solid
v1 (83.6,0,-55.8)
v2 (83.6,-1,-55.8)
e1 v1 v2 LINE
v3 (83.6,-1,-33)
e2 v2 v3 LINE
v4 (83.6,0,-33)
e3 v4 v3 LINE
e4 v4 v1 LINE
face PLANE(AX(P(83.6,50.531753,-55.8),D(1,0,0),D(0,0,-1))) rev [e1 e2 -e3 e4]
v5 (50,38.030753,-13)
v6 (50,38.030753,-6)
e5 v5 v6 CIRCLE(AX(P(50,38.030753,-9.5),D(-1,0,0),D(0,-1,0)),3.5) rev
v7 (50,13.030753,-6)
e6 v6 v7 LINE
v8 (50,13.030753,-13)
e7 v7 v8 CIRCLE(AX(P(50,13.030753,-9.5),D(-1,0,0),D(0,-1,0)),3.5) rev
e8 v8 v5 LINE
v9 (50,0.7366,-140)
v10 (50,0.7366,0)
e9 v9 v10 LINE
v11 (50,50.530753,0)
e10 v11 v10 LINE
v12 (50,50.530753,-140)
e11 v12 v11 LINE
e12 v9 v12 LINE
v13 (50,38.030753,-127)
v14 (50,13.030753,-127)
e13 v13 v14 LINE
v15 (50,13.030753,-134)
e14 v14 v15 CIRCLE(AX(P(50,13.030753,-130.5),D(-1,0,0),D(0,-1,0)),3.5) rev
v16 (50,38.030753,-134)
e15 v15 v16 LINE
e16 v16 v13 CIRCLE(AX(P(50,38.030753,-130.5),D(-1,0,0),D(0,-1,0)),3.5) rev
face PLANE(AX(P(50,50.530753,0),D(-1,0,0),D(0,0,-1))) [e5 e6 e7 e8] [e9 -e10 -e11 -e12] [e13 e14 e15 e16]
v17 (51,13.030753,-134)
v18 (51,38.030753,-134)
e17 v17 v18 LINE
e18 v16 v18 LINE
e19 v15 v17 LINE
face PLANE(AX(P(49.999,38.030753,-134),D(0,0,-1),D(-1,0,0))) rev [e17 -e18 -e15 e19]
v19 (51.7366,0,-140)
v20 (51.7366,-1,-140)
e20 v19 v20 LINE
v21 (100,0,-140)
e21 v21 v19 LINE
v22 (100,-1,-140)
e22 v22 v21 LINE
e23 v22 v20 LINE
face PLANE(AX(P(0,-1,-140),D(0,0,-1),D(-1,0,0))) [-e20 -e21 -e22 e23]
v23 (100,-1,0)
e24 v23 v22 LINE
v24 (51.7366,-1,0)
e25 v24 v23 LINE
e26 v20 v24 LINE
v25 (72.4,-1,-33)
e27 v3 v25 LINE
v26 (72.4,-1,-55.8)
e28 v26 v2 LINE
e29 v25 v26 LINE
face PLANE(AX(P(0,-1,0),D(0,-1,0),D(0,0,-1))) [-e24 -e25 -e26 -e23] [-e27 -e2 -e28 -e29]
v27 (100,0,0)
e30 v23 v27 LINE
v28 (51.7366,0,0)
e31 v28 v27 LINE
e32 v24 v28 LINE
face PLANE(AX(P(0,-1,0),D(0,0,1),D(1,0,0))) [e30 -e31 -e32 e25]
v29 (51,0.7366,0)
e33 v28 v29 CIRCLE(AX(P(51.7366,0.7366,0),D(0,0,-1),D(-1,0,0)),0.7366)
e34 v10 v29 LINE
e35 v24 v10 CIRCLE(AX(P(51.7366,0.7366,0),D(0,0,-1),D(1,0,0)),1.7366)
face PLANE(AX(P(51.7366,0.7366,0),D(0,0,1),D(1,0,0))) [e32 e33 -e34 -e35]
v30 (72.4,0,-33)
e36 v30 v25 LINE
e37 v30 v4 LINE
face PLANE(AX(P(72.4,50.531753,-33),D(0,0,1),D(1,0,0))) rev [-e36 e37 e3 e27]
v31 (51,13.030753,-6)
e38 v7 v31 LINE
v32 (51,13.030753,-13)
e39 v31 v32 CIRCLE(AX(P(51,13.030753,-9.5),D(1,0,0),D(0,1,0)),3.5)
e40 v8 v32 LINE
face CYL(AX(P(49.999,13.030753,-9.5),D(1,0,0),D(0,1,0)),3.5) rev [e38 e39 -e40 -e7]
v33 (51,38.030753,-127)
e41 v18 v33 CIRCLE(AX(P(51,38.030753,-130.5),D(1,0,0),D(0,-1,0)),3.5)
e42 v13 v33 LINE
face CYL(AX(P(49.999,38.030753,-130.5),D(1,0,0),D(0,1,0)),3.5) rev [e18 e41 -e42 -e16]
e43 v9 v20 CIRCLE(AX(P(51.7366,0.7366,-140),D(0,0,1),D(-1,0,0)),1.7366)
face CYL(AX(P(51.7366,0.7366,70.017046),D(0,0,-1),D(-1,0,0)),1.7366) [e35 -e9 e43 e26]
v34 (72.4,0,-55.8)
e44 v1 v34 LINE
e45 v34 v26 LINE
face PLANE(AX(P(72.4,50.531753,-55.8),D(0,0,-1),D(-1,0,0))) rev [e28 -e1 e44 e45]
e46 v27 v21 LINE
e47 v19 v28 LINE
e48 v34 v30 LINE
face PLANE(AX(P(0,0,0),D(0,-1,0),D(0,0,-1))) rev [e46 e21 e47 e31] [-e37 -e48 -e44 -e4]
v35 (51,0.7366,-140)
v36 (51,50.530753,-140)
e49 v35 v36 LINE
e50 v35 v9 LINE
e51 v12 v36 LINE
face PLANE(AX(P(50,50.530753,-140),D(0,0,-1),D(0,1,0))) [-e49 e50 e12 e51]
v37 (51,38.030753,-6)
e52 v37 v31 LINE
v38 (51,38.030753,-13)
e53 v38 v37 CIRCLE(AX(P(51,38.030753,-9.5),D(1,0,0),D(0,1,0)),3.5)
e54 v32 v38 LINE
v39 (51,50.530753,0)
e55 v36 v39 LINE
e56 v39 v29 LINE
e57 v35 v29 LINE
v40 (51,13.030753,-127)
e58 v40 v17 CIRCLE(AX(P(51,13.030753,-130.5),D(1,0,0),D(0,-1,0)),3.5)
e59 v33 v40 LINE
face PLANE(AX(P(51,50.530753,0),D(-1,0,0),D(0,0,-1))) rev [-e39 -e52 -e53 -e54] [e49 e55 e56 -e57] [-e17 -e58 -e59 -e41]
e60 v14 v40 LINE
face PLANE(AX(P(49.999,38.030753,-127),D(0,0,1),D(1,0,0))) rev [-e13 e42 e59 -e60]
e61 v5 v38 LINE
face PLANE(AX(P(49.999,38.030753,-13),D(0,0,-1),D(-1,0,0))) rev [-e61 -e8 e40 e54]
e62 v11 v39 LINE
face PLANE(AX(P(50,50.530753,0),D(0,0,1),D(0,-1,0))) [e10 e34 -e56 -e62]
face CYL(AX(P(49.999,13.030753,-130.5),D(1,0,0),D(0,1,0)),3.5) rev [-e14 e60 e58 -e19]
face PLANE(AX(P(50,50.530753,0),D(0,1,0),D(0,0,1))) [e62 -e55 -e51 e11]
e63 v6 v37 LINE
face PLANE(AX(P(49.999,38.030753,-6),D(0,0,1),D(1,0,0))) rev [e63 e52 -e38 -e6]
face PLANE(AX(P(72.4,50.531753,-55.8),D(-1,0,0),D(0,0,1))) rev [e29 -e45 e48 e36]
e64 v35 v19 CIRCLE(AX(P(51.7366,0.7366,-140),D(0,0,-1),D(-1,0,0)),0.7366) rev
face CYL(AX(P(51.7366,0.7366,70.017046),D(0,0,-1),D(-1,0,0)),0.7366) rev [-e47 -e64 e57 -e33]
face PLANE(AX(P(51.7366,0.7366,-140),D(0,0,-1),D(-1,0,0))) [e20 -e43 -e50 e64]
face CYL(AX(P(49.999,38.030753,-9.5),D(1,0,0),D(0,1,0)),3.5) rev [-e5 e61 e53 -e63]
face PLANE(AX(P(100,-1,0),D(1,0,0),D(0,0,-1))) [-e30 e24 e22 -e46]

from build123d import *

# Parameters (mm, degrees)
SKETCH1_W              = 100
SKETCH1_H              = 140
BASE_FLANGE1_DEPTH     = 1
SKETCHED_START         = -140
SKETCHED_BEND1_DEPTH   = 140
SKETCHED_BEND1_2_DEPTH = 140
CUT_EXTRUDE1_REACH     = 158.698
CUT_EXTRUDE2_REACH     = 181.598
SKETCH17_W             = 11.2
SKETCH17_H             = 22.8


# Read off the part's stored shape, not the designer's step: Sketched Bend1
# Sheet-metal steps are written as plain solids
with BuildPart() as part:
    # Sketch1 → Base-Flange1 (new body)
    with BuildSketch(Plane(origin=(0, 0, 0), x_dir=(1, 0, 0), z_dir=(0, 1, 0))):
        with Locations((50, 70)):
            Rectangle(SKETCH1_W, SKETCH1_H)
    extrude(amount=-BASE_FLANGE1_DEPTH)

    # Sketched Bend1 outline → Sketched Bend1 (cut)
    with BuildSketch(Plane.XY.offset(SKETCHED_START)):
        with BuildLine():
            ThreePointArc((51.7366, -1), (50.804773836, -0.728828115), (50.16395891, 0))
            Line((50.16395891, 0), (0, 0))
            Line((0, 0), (0, -1))
            Line((0, -1), (51.7366, -1))
        make_face()
    extrude(amount=SKETCHED_BEND1_DEPTH, mode=Mode.SUBTRACT)

    # Sketched Bend1 2 outline → Sketched Bend1 2 (add)
    with BuildSketch(Plane.XY.offset(SKETCHED_START)):
        with BuildLine():
            Line((51, 50.530753262), (50, 50.530753262))
            Line((50, 50.530753262), (50, 0.7366))
            ThreePointArc((50, 0.7366), (50.041485243, 0.359286442), (50.16395891, 0))
            Line((50.16395891, 0), (51.7366, 0))
            ThreePointArc((51.7366, 0), (51.215745145, 0.215745145), (51, 0.7366))
            Line((51, 0.7366), (51, 50.530753262))
        make_face()
    extrude(amount=SKETCHED_BEND1_2_DEPTH)

    # Sketch14 → Cut-Extrude1 (cut, up to next)
    with BuildSketch(Plane(origin=(51, 0, 0), x_dir=(0, 0, -1), z_dir=(1, 0, 0)), mode=Mode.PRIVATE) as cut_extrude1_sk1:
        with BuildLine():
            Line((13, 38.030753262), (13, 13.030753262))
            ThreePointArc((13, 13.030753262), (9.5, 9.530753262), (6, 13.030753262))
            Line((6, 13.030753262), (6, 38.030753262))
            ThreePointArc((6, 38.030753262), (9.5, 41.530753262), (13, 38.030753262))
        make_face()
    cut_extrude1_tool1 = extrude(cut_extrude1_sk1.sketch, amount=-CUT_EXTRUDE1_REACH, mode=Mode.PRIVATE) & part.part
    # Sketch14 → Cut-Extrude1 (cut, up to next)
    with BuildSketch(Plane(origin=(51, 0, 0), x_dir=(0, 0, -1), z_dir=(1, 0, 0)), mode=Mode.PRIVATE) as cut_extrude1_sk2:
        with BuildLine():
            Line((127, 38.030753262), (127, 13.030753262))
            ThreePointArc((127, 13.030753262), (130.5, 9.530753262), (134, 13.030753262))
            Line((134, 13.030753262), (134, 38.030753262))
            ThreePointArc((134, 38.030753262), (130.5, 41.530753262), (127, 38.030753262))
        make_face()
    cut_extrude1_tool2 = extrude(cut_extrude1_sk2.sketch, amount=-CUT_EXTRUDE1_REACH, mode=Mode.PRIVATE) & part.part
    add(cut_extrude1_tool1.solids().sort_by_distance((51, 25.530753, -9.5))[0], mode=Mode.SUBTRACT)
    add(cut_extrude1_tool2.solids().sort_by_distance((51, 25.530753, -130.5))[0], mode=Mode.SUBTRACT)

    # Sketch17 → Cut-Extrude2 (cut, up to next)
    with BuildSketch(Plane.XZ.offset(1), mode=Mode.PRIVATE) as cut_extrude2_sk1:
        with Locations((78, -44.4)):
            Rectangle(SKETCH17_W, SKETCH17_H)
    cut_extrude2_tool1 = extrude(cut_extrude2_sk1.sketch, amount=-CUT_EXTRUDE2_REACH, mode=Mode.PRIVATE) & part.part
    add(cut_extrude2_tool1.solids().sort_by_distance((78, -1, -44.4))[0], mode=Mode.SUBTRACT)


solid = part.part
